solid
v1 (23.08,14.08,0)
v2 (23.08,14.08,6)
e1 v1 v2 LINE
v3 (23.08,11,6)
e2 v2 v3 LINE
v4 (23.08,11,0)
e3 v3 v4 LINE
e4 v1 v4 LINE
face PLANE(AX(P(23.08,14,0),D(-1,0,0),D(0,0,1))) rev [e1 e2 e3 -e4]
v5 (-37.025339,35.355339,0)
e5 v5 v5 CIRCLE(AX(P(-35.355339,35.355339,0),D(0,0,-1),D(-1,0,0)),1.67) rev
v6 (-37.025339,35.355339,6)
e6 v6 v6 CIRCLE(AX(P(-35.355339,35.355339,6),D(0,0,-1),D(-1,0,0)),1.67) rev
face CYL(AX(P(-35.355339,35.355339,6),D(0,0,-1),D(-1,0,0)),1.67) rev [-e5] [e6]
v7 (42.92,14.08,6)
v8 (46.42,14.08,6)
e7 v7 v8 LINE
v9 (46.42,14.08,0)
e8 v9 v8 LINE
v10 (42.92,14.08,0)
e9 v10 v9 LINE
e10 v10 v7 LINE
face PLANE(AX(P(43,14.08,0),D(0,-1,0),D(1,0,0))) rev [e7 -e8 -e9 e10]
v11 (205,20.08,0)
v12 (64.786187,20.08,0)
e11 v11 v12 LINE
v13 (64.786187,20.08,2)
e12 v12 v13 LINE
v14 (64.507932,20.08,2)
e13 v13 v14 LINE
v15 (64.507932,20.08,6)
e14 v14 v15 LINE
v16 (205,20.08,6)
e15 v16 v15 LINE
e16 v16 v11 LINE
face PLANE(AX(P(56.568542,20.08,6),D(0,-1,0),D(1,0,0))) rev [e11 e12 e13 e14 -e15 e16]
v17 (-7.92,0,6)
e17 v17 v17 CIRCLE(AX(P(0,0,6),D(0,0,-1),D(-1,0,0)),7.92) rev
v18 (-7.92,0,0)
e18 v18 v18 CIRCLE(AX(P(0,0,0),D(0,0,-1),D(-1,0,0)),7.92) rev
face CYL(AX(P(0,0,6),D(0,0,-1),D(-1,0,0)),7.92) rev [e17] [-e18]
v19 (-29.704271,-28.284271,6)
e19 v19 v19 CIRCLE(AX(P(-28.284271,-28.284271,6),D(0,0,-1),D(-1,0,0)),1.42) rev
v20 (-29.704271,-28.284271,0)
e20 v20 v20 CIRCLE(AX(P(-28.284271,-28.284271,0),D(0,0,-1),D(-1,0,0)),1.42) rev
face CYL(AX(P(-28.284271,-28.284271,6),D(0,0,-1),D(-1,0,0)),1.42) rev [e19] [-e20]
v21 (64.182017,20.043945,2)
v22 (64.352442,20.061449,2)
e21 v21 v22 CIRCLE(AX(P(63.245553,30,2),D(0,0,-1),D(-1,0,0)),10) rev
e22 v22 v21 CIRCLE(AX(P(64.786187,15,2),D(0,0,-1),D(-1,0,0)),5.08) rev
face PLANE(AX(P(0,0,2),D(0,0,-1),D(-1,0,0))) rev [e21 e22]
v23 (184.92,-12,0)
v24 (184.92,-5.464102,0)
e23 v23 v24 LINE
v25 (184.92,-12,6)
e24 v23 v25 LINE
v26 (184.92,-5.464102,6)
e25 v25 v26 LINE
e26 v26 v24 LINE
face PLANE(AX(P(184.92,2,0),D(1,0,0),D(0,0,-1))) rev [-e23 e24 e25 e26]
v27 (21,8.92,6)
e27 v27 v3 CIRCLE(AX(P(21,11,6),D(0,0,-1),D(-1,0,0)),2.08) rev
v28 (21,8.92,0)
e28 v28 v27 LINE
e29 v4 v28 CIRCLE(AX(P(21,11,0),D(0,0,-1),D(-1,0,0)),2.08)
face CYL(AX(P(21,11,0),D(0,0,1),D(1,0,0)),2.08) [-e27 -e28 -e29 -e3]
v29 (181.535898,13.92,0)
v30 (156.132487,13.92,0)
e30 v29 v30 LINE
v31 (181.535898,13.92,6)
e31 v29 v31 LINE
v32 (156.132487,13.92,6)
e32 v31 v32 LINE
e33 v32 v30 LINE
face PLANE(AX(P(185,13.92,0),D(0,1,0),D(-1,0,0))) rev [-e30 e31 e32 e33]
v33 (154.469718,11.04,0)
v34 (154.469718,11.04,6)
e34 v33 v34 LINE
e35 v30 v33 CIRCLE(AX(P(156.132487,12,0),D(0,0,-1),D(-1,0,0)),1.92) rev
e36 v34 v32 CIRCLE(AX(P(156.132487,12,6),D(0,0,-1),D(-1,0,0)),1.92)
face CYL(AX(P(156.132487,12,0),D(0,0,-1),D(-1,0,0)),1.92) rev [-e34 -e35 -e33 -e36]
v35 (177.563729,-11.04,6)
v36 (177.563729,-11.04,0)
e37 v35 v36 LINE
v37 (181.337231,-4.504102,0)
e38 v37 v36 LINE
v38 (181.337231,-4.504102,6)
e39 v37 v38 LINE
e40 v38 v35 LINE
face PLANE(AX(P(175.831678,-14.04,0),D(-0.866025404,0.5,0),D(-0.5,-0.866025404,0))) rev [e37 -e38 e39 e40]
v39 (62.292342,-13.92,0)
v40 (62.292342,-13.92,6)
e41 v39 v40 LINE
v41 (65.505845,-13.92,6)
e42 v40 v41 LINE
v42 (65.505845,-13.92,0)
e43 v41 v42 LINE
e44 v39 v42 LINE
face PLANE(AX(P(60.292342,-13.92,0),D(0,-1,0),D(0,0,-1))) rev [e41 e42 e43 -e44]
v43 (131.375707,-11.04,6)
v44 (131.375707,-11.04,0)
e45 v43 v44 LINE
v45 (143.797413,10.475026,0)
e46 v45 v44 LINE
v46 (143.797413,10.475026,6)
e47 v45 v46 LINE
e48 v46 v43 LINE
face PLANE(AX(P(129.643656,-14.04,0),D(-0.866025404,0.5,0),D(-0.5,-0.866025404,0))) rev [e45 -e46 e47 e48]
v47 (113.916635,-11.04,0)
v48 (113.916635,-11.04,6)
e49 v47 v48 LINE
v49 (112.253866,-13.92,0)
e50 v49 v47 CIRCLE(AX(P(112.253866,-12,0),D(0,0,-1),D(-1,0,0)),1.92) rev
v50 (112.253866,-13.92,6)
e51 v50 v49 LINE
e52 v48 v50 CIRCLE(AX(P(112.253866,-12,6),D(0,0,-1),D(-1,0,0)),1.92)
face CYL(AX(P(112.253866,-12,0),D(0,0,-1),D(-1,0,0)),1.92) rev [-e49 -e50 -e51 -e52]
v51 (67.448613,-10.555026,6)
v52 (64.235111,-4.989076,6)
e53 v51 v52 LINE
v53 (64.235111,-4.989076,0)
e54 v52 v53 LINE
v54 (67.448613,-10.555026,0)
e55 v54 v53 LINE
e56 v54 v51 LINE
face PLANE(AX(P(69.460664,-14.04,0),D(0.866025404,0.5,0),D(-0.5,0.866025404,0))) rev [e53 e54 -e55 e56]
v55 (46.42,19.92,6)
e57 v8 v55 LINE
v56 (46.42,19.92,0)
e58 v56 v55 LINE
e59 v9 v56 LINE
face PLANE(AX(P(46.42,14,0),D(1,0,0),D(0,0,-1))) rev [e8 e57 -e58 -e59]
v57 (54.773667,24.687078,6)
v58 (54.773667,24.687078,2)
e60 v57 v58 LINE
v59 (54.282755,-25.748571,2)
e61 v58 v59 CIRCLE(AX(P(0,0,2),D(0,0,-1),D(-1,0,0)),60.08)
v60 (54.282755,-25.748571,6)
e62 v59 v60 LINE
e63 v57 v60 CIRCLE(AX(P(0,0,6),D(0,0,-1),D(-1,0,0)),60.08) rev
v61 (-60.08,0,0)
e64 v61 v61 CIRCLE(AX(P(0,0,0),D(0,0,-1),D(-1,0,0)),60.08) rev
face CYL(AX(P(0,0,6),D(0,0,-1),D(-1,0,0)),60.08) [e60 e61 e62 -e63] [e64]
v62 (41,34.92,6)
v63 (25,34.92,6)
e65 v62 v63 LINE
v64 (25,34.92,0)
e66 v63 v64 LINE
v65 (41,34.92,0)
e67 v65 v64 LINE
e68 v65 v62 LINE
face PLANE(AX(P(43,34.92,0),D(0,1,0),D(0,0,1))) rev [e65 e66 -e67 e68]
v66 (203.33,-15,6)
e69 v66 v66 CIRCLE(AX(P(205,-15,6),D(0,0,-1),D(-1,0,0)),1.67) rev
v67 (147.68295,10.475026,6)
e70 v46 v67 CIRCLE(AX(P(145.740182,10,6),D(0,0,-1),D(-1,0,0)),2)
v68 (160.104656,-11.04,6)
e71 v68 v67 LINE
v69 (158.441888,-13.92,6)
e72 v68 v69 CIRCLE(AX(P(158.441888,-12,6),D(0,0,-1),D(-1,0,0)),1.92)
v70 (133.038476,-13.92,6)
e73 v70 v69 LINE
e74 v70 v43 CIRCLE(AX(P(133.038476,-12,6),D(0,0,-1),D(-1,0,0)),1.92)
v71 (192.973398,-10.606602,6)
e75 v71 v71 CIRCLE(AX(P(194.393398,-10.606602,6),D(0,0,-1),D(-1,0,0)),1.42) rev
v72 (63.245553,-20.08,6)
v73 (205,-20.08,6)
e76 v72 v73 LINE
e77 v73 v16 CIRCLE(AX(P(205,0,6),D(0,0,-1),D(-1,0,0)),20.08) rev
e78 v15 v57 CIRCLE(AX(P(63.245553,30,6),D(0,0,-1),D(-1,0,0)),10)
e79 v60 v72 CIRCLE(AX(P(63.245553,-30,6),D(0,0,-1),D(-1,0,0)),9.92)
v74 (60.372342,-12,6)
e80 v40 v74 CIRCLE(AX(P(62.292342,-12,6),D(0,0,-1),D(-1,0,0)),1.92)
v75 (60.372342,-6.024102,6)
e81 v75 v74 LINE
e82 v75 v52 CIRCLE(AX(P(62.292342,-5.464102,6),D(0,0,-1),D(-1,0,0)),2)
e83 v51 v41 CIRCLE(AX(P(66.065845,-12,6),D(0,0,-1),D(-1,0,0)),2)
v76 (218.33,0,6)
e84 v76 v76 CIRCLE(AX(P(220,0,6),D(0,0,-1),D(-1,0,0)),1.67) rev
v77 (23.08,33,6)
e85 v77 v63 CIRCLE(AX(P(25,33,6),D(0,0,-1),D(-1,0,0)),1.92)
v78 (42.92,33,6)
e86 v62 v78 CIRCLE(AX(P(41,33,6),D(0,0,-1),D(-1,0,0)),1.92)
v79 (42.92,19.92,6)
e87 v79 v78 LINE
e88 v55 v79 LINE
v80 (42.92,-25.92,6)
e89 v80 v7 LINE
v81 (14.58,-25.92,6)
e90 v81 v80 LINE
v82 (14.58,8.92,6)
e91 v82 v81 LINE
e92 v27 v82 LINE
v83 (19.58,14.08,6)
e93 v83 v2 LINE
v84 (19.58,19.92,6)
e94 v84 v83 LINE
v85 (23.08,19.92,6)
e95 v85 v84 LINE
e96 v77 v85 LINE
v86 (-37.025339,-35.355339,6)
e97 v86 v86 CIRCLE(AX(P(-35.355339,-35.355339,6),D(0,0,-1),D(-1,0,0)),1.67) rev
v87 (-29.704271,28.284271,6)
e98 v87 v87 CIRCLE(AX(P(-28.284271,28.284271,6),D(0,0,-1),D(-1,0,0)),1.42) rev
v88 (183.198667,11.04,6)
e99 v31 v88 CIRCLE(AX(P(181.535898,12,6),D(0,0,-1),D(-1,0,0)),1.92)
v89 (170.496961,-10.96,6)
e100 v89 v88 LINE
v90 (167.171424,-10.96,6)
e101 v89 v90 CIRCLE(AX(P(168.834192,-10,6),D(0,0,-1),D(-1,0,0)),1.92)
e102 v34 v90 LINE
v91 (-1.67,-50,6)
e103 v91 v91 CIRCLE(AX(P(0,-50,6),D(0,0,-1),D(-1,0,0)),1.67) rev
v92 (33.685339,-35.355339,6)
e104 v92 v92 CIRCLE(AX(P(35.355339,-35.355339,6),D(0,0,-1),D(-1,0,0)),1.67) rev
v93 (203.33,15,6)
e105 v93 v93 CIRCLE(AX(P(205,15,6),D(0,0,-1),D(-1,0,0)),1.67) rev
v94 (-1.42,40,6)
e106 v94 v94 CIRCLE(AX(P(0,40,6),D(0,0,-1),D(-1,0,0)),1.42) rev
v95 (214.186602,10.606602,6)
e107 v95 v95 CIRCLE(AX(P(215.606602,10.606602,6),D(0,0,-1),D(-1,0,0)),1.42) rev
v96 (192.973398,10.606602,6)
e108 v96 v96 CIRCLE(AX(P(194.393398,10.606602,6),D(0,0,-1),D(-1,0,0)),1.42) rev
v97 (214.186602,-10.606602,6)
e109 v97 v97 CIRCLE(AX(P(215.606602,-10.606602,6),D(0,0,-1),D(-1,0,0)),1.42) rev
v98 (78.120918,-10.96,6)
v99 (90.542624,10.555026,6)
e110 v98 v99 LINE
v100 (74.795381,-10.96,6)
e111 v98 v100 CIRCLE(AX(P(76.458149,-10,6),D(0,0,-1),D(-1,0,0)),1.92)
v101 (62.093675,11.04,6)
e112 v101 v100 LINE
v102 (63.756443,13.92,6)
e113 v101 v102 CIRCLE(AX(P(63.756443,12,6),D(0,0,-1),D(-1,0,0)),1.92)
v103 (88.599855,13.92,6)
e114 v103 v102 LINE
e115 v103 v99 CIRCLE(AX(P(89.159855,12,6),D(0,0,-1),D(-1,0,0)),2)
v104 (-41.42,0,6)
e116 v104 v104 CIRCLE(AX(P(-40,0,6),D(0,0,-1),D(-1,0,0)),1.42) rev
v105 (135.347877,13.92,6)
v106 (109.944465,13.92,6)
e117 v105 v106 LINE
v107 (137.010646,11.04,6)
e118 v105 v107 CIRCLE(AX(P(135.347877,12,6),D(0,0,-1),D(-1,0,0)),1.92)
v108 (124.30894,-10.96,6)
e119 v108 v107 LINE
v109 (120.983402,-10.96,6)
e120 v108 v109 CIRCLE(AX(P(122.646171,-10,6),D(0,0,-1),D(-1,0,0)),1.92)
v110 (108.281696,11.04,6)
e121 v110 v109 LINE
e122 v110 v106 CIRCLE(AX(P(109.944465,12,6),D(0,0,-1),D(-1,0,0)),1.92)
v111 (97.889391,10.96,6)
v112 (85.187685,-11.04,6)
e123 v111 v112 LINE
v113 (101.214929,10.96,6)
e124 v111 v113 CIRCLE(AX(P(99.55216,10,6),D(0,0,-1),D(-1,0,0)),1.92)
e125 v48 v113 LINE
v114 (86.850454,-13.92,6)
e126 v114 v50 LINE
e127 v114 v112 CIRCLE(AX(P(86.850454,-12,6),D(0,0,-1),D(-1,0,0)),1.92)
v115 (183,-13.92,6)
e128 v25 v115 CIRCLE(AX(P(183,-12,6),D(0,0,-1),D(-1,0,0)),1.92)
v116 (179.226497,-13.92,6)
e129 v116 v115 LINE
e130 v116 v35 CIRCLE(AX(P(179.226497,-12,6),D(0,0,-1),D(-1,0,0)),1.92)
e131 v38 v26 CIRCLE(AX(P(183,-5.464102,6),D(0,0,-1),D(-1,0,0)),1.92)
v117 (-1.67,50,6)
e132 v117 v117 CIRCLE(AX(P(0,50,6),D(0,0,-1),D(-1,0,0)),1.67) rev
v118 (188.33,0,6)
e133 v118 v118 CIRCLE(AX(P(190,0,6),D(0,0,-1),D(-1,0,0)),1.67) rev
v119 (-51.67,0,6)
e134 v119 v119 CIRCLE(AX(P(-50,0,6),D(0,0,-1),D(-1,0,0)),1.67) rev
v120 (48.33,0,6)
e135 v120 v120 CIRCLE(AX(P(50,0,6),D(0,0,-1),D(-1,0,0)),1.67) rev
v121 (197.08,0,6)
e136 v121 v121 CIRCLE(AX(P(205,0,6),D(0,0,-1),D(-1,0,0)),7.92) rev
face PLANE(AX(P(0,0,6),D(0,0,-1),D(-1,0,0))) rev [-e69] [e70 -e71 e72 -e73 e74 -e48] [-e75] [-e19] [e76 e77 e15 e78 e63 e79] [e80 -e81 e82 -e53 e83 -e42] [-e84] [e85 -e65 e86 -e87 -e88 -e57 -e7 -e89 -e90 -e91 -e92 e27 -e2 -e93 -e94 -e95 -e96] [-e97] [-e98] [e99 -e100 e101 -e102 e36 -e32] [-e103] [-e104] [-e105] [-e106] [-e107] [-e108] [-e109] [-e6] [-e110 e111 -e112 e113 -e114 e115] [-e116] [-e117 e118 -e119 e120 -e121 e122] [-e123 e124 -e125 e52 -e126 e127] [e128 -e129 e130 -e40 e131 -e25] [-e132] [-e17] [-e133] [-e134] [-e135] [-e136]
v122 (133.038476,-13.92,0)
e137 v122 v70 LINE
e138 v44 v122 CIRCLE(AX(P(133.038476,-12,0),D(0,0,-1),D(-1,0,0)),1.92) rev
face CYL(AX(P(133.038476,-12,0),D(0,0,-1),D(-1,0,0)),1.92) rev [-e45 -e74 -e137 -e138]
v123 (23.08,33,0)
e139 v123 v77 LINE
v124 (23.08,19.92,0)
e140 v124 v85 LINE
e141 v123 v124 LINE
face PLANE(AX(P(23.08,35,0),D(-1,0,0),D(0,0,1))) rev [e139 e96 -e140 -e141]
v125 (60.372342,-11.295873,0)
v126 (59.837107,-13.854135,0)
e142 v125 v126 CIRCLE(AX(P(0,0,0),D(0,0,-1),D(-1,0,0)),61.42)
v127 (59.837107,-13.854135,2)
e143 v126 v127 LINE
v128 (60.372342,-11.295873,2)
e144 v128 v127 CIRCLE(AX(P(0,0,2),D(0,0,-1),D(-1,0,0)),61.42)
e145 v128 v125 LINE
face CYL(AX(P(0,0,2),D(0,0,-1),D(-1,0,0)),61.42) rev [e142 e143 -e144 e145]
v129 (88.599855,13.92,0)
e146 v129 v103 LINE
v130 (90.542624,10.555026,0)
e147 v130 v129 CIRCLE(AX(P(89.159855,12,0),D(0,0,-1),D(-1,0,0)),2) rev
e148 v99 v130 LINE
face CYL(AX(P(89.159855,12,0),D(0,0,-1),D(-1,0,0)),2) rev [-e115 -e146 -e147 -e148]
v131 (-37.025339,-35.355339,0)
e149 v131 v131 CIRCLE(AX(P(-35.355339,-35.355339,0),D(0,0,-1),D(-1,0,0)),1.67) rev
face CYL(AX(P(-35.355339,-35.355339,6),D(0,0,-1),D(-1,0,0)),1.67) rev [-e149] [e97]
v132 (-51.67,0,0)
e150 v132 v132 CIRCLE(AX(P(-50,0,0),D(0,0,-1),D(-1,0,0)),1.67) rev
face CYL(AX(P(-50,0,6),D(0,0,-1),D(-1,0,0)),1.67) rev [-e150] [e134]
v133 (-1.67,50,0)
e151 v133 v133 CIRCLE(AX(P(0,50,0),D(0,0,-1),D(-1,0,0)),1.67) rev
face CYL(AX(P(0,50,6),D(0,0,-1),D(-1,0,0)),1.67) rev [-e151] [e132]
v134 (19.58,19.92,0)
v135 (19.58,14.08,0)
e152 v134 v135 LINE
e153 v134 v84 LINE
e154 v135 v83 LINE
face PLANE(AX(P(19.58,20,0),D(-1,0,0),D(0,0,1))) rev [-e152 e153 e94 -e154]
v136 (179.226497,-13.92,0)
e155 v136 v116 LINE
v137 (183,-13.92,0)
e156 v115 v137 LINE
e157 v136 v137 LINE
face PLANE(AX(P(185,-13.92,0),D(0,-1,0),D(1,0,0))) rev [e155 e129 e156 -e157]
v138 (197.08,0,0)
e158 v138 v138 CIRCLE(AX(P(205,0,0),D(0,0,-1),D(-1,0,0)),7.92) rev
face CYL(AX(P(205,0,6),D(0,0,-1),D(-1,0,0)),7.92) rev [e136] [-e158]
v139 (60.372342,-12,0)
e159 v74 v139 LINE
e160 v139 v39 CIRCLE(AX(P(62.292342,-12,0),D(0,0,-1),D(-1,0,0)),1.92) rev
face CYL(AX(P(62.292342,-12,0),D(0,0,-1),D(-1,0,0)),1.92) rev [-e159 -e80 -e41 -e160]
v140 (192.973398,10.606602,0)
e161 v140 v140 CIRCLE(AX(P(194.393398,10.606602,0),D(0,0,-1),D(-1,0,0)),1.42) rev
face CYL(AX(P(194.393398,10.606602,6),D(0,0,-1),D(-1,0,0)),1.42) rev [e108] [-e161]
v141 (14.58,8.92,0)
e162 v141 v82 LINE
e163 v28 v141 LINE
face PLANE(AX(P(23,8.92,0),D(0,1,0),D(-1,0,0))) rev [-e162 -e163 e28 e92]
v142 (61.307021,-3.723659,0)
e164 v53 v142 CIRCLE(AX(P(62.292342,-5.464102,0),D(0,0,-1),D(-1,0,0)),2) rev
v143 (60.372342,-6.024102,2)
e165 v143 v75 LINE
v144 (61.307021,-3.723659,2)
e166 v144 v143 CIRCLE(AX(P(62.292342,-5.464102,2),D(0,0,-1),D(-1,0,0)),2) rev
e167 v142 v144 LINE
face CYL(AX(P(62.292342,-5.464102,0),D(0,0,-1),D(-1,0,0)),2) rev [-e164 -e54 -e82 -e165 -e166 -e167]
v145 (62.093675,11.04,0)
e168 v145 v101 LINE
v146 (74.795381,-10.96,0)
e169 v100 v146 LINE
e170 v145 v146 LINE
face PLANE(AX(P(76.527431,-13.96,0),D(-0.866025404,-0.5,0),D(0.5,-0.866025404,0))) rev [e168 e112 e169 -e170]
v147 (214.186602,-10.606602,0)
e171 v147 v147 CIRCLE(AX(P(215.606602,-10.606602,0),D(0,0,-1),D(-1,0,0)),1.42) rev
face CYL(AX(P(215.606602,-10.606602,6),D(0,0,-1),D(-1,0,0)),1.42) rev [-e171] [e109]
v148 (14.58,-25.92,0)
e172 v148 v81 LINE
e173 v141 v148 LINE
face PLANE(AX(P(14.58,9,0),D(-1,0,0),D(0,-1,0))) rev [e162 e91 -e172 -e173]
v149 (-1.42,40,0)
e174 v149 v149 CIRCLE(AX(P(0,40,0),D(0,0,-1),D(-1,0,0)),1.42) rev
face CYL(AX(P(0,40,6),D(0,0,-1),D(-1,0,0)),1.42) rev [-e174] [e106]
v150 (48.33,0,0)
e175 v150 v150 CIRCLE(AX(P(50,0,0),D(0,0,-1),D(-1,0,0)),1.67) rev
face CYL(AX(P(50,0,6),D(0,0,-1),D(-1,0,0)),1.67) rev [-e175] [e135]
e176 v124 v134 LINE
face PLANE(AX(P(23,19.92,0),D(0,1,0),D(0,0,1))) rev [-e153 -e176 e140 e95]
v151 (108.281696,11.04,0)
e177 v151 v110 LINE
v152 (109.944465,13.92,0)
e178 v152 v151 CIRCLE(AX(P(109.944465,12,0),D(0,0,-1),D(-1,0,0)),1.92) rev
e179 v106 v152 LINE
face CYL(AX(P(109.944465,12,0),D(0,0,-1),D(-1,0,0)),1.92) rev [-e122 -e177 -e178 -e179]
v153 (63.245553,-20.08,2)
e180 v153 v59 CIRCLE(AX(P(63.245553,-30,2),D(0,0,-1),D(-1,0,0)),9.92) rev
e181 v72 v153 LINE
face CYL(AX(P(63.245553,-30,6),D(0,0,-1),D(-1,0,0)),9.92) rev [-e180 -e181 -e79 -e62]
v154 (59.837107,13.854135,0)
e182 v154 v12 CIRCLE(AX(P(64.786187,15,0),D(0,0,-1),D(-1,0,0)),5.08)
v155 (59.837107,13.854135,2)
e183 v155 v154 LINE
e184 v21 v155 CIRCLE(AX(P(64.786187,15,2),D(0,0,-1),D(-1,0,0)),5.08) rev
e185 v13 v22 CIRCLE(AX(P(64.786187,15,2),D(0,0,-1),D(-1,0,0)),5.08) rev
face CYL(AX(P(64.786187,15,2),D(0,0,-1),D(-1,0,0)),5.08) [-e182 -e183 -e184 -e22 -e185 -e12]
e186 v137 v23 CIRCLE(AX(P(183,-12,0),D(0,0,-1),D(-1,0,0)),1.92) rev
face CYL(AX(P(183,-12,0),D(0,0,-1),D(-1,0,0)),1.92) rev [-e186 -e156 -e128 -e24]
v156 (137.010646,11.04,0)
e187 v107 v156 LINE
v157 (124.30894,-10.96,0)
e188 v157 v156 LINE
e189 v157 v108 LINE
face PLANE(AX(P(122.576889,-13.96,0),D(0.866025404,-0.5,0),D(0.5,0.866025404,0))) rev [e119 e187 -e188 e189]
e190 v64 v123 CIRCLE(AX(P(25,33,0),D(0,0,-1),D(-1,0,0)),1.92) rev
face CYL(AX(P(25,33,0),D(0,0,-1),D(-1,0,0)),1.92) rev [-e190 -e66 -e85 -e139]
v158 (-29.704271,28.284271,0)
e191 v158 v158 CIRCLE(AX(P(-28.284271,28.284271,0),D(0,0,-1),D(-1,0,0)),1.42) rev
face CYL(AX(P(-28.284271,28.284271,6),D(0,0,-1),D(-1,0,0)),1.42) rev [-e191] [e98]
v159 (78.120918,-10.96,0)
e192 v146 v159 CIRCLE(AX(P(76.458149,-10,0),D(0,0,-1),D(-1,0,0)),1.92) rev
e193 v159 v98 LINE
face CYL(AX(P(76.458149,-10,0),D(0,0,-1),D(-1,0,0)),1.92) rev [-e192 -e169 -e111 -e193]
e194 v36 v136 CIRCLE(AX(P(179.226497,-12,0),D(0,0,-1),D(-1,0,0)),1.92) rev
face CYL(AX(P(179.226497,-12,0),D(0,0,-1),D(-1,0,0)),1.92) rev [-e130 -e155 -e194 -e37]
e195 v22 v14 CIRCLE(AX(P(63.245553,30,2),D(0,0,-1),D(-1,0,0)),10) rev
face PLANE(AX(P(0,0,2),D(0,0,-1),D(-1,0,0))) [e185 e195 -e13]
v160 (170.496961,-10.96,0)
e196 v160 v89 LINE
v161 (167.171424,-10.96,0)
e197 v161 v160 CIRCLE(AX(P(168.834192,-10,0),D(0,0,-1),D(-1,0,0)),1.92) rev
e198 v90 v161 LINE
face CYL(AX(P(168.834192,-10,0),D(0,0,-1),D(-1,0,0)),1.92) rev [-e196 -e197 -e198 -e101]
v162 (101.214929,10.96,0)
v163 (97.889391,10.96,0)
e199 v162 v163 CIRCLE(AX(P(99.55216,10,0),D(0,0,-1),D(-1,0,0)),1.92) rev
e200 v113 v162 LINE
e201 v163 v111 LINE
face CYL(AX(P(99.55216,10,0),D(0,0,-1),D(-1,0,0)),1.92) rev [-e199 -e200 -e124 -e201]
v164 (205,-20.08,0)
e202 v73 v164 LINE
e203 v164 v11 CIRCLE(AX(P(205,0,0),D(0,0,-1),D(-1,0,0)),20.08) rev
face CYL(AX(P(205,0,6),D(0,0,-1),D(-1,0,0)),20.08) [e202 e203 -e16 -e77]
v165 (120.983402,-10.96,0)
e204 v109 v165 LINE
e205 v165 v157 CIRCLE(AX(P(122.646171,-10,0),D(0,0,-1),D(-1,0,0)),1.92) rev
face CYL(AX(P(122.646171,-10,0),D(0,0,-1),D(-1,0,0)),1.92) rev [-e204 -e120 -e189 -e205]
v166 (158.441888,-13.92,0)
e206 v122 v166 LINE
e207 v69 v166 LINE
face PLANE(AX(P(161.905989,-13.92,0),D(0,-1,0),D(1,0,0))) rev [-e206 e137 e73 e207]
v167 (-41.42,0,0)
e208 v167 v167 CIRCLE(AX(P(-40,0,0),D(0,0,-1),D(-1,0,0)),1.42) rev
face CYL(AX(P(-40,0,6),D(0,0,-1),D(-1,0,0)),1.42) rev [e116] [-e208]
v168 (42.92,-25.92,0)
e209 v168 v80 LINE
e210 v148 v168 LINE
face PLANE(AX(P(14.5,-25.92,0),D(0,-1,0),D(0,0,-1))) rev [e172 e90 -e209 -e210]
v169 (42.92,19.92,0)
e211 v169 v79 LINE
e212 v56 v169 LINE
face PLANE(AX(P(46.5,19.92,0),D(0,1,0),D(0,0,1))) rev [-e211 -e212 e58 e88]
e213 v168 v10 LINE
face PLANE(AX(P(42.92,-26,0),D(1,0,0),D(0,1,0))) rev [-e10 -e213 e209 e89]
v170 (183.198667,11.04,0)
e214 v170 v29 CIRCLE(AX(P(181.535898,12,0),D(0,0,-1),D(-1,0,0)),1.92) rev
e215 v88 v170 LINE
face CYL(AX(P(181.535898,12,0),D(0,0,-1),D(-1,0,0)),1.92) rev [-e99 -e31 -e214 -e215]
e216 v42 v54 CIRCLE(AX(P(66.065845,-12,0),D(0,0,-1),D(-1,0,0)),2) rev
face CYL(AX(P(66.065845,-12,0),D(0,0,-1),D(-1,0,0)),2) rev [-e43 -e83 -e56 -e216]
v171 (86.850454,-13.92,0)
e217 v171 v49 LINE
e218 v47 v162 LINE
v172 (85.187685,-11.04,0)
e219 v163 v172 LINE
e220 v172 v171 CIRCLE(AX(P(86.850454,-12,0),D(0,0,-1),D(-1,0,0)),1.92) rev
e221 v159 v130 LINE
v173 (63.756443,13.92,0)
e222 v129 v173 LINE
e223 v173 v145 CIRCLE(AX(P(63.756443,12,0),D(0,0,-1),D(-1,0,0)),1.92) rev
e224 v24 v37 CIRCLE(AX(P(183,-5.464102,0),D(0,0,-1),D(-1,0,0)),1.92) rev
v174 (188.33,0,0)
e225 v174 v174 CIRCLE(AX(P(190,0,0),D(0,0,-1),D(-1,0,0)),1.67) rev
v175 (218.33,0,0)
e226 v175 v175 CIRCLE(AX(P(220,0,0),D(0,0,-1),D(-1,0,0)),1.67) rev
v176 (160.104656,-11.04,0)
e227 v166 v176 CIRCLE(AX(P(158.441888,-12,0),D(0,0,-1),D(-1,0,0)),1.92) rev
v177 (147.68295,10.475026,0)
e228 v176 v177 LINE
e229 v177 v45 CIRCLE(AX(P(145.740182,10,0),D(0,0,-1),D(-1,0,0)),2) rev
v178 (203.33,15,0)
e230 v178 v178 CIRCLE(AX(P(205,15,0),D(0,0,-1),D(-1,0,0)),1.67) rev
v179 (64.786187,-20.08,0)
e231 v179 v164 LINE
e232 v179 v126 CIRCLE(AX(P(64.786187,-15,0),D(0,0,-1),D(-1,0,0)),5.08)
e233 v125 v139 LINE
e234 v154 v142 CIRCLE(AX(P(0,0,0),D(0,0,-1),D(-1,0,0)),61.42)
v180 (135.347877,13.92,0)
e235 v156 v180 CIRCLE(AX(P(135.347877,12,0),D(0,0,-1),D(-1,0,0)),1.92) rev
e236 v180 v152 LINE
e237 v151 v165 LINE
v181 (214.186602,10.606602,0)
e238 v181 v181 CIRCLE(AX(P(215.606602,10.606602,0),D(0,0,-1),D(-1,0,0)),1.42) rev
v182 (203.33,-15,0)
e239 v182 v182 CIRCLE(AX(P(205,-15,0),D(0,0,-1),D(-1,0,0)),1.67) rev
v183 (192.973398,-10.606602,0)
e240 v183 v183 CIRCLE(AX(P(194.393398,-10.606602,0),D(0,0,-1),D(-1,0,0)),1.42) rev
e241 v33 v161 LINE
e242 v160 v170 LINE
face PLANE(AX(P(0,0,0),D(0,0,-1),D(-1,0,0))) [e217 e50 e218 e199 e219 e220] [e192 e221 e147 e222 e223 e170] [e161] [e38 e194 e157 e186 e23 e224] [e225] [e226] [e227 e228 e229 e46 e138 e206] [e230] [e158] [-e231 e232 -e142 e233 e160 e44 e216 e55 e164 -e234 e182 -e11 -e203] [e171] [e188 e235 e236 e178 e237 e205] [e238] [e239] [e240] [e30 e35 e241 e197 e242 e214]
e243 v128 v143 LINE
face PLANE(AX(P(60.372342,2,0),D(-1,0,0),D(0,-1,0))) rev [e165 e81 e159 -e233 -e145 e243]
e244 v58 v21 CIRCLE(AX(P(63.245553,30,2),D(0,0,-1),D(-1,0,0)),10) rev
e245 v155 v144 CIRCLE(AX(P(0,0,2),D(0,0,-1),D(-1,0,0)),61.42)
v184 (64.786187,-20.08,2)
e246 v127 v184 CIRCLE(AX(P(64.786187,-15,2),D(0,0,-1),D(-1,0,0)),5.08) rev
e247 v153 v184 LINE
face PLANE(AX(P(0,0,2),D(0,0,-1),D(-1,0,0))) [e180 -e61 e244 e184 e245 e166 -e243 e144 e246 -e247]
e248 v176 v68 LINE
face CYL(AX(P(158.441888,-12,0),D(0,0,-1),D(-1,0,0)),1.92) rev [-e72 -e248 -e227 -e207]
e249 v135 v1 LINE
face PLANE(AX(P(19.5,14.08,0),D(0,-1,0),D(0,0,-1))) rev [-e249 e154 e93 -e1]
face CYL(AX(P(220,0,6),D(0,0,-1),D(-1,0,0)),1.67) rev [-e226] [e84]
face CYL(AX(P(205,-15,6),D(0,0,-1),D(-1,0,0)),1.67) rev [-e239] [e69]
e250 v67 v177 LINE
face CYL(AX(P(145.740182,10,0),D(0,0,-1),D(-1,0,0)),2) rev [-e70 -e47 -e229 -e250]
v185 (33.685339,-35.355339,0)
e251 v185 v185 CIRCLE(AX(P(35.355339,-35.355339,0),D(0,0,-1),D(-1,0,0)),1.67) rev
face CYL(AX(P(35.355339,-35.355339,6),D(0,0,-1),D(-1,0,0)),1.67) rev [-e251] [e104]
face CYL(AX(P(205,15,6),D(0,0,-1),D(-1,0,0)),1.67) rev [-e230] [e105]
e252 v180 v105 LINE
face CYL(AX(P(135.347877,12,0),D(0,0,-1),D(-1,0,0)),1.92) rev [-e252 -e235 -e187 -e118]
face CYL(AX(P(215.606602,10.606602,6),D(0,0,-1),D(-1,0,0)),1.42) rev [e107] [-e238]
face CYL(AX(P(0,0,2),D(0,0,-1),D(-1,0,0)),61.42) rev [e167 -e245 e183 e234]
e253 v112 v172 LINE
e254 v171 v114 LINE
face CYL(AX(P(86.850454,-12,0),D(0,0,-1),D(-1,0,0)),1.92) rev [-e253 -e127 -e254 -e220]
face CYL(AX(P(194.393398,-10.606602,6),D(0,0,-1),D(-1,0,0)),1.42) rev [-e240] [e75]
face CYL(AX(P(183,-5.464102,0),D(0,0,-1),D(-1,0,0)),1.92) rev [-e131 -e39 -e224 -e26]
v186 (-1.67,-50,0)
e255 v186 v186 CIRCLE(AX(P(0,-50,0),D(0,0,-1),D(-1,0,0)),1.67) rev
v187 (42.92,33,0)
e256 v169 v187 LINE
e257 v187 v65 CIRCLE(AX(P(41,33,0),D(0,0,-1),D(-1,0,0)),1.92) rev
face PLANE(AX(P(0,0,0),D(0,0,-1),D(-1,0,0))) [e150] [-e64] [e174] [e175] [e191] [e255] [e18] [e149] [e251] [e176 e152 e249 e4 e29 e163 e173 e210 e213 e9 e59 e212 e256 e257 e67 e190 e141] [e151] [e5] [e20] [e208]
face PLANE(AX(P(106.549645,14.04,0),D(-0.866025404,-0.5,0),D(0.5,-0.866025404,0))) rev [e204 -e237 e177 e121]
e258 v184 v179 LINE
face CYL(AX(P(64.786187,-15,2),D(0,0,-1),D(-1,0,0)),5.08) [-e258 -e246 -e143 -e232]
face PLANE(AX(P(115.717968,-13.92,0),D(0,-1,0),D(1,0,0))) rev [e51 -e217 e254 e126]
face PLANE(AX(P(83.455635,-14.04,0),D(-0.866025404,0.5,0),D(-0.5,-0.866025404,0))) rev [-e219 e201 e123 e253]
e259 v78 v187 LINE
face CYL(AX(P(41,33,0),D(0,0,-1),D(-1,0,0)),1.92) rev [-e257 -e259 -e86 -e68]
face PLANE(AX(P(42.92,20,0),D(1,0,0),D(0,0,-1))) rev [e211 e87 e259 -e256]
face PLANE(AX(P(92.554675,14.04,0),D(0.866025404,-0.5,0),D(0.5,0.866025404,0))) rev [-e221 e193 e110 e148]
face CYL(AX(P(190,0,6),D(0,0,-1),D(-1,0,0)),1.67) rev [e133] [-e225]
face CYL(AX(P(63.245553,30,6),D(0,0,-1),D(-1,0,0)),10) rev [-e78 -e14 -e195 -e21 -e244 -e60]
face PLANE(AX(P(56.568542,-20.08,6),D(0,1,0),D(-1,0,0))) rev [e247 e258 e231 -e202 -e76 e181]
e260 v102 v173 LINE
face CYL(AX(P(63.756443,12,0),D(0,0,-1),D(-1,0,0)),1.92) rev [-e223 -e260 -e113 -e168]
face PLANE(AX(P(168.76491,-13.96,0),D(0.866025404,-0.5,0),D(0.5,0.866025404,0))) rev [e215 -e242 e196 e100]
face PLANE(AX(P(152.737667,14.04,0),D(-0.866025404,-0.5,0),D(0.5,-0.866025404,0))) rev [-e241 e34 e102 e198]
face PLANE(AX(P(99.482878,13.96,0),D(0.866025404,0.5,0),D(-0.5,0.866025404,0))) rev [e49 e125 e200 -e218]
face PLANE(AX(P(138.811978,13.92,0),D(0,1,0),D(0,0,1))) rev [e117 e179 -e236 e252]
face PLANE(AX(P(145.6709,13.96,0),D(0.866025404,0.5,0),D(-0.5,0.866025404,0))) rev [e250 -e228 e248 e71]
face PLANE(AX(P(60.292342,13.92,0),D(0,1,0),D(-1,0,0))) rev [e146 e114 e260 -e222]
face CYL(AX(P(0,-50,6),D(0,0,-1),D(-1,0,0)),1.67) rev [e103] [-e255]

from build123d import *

# Parameters (mm, degrees)
SKETCH1_R              = 8
SKETCH1_R_2            = 1.75
SKETCH1_R_3            = 1.5
BOSS_EXTRUDE1_DEPTH    = 6
CUT_EXTRUDE2_DEPTH     = 233.939906414
FILLET3_R              = 10
FILLET4_R              = 2
SKETCH4_R              = 61.5
SKETCH4_R_2            = 60
CUT_EXTRUDE3_DEPTH     = 2
FILLET6_R              = 5
CUT_EXTRUDE5_DEPTH     = 233.939906414
FILLET7_R              = 2
MOVE_FACE1_OUTLINE_R   = 60.08
MOVE_FACE1_OUTLINE_R_2 = 60
MOVE_FACE1_OUTLINE_R_3 = 8
MOVE_FACE1_OUTLINE_R_4 = 7.92
MOVE_FACE1_OUTLINE_R_5 = 1.75
MOVE_FACE1_OUTLINE_R_6 = 1.67
MOVE_FACE1_OUTLINE_R_7 = 1.5
MOVE_FACE1_OUTLINE_R_8 = 1.42
MOVE_FACE1_DEPTH       = 6
MOVE_START             = 2
MOVE_FACE1_2_DEPTH     = 4
MOVE_FACE1_3_DEPTH     = 2


# Read off the part's stored shape, not the designer's step: Move Face1
with BuildPart() as part:
    # Sketch1 → Boss-Extrude1 (new body)
    with BuildSketch(Plane.XY):
        with BuildLine():
            Line((56.568542495, -20), (205, -20))
            ThreePointArc((205, -20), (225, 0), (205, 20))
            Line((205, 20), (56.568542495, 20))
            ThreePointArc((56.568542495, 20), (-60, 0), (56.568542495, -20))
        make_face()
        Circle(SKETCH1_R, mode=Mode.SUBTRACT)
        with Locations((205, 0)):
            Circle(SKETCH1_R, mode=Mode.SUBTRACT)
        with Locations((205, -15)):
            Circle(SKETCH1_R_2, mode=Mode.SUBTRACT)
        with Locations((215.606601718, -10.606601718)):
            Circle(SKETCH1_R_3, mode=Mode.SUBTRACT)
        with Locations((190, 0)):
            Circle(SKETCH1_R_2, mode=Mode.SUBTRACT)
        with Locations((194.393398282, -10.606601718)):
            Circle(SKETCH1_R_3, mode=Mode.SUBTRACT)
        with Locations((205, 15)):
            Circle(SKETCH1_R_2, mode=Mode.SUBTRACT)
        with Locations((194.393398282, 10.606601718)):
            Circle(SKETCH1_R_3, mode=Mode.SUBTRACT)
        with Locations((220, 0)):
            Circle(SKETCH1_R_2, mode=Mode.SUBTRACT)
        with Locations((215.606601718, 10.606601718)):
            Circle(SKETCH1_R_3, mode=Mode.SUBTRACT)
        with Locations((0, -50)):
            Circle(SKETCH1_R_2, mode=Mode.SUBTRACT)
        with Locations((-28.284271247, -28.284271247)):
            Circle(SKETCH1_R_3, mode=Mode.SUBTRACT)
        with Locations((-35.355339059, -35.355339059)):
            Circle(SKETCH1_R_2, mode=Mode.SUBTRACT)
        with Locations((-40, 0)):
            Circle(SKETCH1_R_3, mode=Mode.SUBTRACT)
        with Locations((-50, 0)):
            Circle(SKETCH1_R_2, mode=Mode.SUBTRACT)
        with Locations((-28.284271247, 28.284271247)):
            Circle(SKETCH1_R_3, mode=Mode.SUBTRACT)
        with Locations((-35.355339059, 35.355339059)):
            Circle(SKETCH1_R_2, mode=Mode.SUBTRACT)
        with Locations((0, 40)):
            Circle(SKETCH1_R_3, mode=Mode.SUBTRACT)
        with Locations((0, 50)):
            Circle(SKETCH1_R_2, mode=Mode.SUBTRACT)
        with Locations((50, 0)):
            Circle(SKETCH1_R_2, mode=Mode.SUBTRACT)
        with Locations((35.355339059, -35.355339059)):
            Circle(SKETCH1_R_2, mode=Mode.SUBTRACT)
    extrude(amount=BOSS_EXTRUDE1_DEPTH)

    # Sketch3 → Cut-Extrude2 (cut, through all)
    with BuildSketch(Plane.XY.offset(6)):
        Polygon((14.5, -26), (43, -26), (43, 14), (46.5, 14), (46.5, 20), (43, 20), (43, 35), (23, 35), (23, 20), (19.5, 20), (19.5, 14), (23, 14), (23, 9), (14.5, 9), align=None)
    extrude(amount=-CUT_EXTRUDE2_DEPTH, mode=Mode.SUBTRACT)

    # Fillet3
    fillet3_edges = [part.edges().sort_by_distance(p)[0] for p in [
        (56.568542495, 20, 3),
        (56.568542495, -20, 3),
    ]]
    fillet(fillet3_edges, radius=FILLET3_R)

    # Fillet4
    fillet4_edges = [part.edges().sort_by_distance(p)[0] for p in [
        (23, 9, 3),
        (23, 35, 3),
        (43, 35, 3),
    ]]
    fillet(fillet4_edges, radius=FILLET4_R)

    # Sketch4 → Cut-Extrude3 (cut)
    with BuildSketch(Plane(origin=(0, 0, 0), x_dir=(-1, 0, 0), z_dir=(0, 0, -1))):
        Circle(SKETCH4_R)
        Circle(SKETCH4_R_2, mode=Mode.SUBTRACT)
    extrude(amount=-CUT_EXTRUDE3_DEPTH, mode=Mode.SUBTRACT)

    # Fillet6
    # the kernel refuses this fillet: 5 mm, written as the material it takes off along each edge
    with BuildSketch(Plane(origin=(57.50107649, -21.81458692, -20.752870911), x_dir=(0.2907993374823747, 0.9567840641021421, 0), z_dir=(0, 0, 1))) as fillet6_piece_1:
        with BuildLine():
            CenterArc((8.63859342, -4.988600088), FILLET6_R, 93.869776954, 103.036040292)
            Line((3.854673099, -6.442596775), (3.376281067, -6.587996444))
            ThreePointArc((3.376281067, -6.587996444), (2.928265838, -5.113942771), (-0.308059139, -0.393826824))
            Line((-0.308059139, -0.393826824), (0.033744506, 0.498860009))
            ThreePointArc((0.033744506, 0.498860009), (4.150574182, 0.359781078), (8.267403859, 0.498860009))
            Line((8.267403859, 0.498860009), (8.301148365, 0))
        make_face()
    extrude(amount=22.752870911, mode=Mode.SUBTRACT)
    with BuildSketch(Plane(origin=(57.50107649, 21.81458692, -20.752870911), x_dir=(0.2907993374823739, -0.9567840641021422, 0), z_dir=(0, 0, 1))) as fillet6_piece_2:
        with BuildLine():
            CenterArc((8.63859342, 4.988600088), FILLET6_R, 163.094182754, 103.036040292)
            Line((3.854673099, 6.442596775), (3.376281067, 6.587996444))
            ThreePointArc((3.376281067, 6.587996444), (2.928265838, 5.113942771), (-0.308059139, 0.393826824))
            Line((-0.308059139, 0.393826824), (0.033744506, -0.498860009))
            ThreePointArc((0.033744506, -0.498860009), (4.150574182, -0.359781078), (8.267403859, -0.498860009))
            Line((8.267403859, -0.498860009), (8.301148365, 0))
        make_face()
    extrude(amount=22.752870911, mode=Mode.SUBTRACT)

    # Sketch6 → Cut-Extrude5 (cut, through all)
    with BuildSketch(Plane.XY.offset(6)):
        Polygon((60.292341855, 14), (92.62395693, 14), (76.458149392, -14), align=None)
        Polygon((83.386352623, -14), (99.55216016, 14), (115.717967697, -14), align=None)
        Polygon((106.48036339, 14), (122.646170928, -14), (138.811978465, 14), align=None)
        Polygon((129.574374158, -14), (145.740181695, 14), (161.905989232, -14), align=None)
        Polygon((152.668384925, 14), (168.834192463, -14), (185, 14), align=None)
        Polygon((60.292341855, 2), (60.292341855, -14), (69.529946162, -14), align=None)
        Polygon((185, 2), (185, -14), (175.762395693, -14), align=None)
    extrude(amount=-CUT_EXTRUDE5_DEPTH, mode=Mode.SUBTRACT)

    # Fillet7
    fillet7_edges = [part.edges().sort_by_distance(p)[0] for p in [
        (60.292341855, 14, 3),
        (185, 2, 3),
        (175.762395693, -14, 3),
        (185, -14, 3),
        (152.668384925, 14, 3),
        (168.834192463, -14, 3),
        (185, 14, 3),
        (129.574374158, -14, 3),
        (161.905989232, -14, 3),
        (145.740181695, 14, 3),
        (138.811978465, 14, 3),
        (122.646170928, -14, 3),
        (106.48036339, 14, 3),
        (115.717967697, -14, 3),
        (99.55216016, 14, 3),
        (83.386352623, -14, 3),
        (60.292341855, -14, 3),
        (76.458149392, -14, 3),
        (69.529946162, -14, 3),
        (92.62395693, 14, 3),
        (60.292341855, 2, 4),
    ]]
    fillet(fillet7_edges, radius=FILLET7_R)

    # Move Face1 outline → Move Face1 (add)
    # profile 1 of 31: a face of its own
    with BuildSketch(Plane.XY):
        with BuildLine():
            ThreePointArc((59.837106665, 13.854135338), (61.206368938, 5.118281102), (61.307020533, -3.723658599))
            ThreePointArc((61.307020533, -3.723658599), (61.348170817, -3.700996103), (61.389842031, -3.67930637))
            ThreePointArc((61.389842031, -3.67930637), (61.284031957, 5.149507464), (59.915044935, 13.872180451))
            ThreePointArc((59.915044935, 13.872180451), (60.872167271, 18.111342335), (64.786186799, 20))
            Line((64.786186799, 20), (205, 20))
            ThreePointArc((205, 20), (225, 0), (205, -20))
            Line((205, -20), (64.786186799, -20))
            ThreePointArc((64.786186799, -20), (60.872167271, -18.111342335), (59.915044935, -13.872180451))
            ThreePointArc((59.915044935, -13.872180451), (60.111708651, -12.993555444), (60.295488483, -12.112145497))
            ThreePointArc((60.295488483, -12.112145497), (60.918349678, -13.453322227), (62.292341855, -14))
            Line((62.292341855, -14), (66.065844547, -14))
            ThreePointArc((66.065844547, -14), (65.783001835, -13.979898987), (65.505844547, -13.92))
            Line((65.505844547, -13.92), (62.292341855, -13.92))
            ThreePointArc((62.292341855, -13.92), (60.934696835, -13.35764502), (60.372341855, -12))
            Line((60.372341855, -12), (60.372341855, -11.295872651))
            ThreePointArc((60.372341855, -11.295872651), (60.118333771, -12.577851352), (59.837106665, -13.854135338))
            ThreePointArc((59.837106665, -13.854135338), (60.809542958, -18.161123813), (64.786186799, -20.08))
            Line((64.786186799, -20.08), (205, -20.08))
            ThreePointArc((205, -20.08), (225.08, 0), (205, 20.08))
            Line((205, 20.08), (64.786186799, 20.08))
            ThreePointArc((64.786186799, 20.08), (64.569116303, 20.075360125), (64.352442334, 20.061448976))
            ThreePointArc((64.352442334, 20.061448976), (64.267267313, 20.052331918), (64.18201732, 20.043944809))
            ThreePointArc((64.18201732, 20.043944809), (60.628293024, 17.918616001), (59.837106665, 13.854135338))
        make_face()
    # profile 2 of 31: a face of its own
    with BuildSketch(Plane.XY):
        with BuildLine():
            Line((67.797895355, -11), (64.024392662, -4.464101615))
            ThreePointArc((64.024392662, -4.464101615), (64.148406031, -4.719101096), (64.23511063, -4.989075841))
            Line((64.23511063, -4.989075841), (67.448613322, -10.555025774))
            ThreePointArc((67.448613322, -10.555025774), (67.639066011, -10.765101532), (67.797895355, -11))
        make_face()
    # profile 3 of 31: a face of its own
    with BuildSketch(Plane.XY):
        Circle(MOVE_FACE1_OUTLINE_R)
        Circle(MOVE_FACE1_OUTLINE_R_2, mode=Mode.SUBTRACT)
    # profile 4 of 31: a face of its own
    with BuildSketch(Plane.XY):
        with BuildLine():
            Line((74.795380617, -10.96), (62.093674695, 11.04))
            ThreePointArc((62.093674695, 11.04), (62.093674695, 12.96), (63.75644347, 13.92))
            Line((63.75644347, 13.92), (88.599855315, 13.92))
            ThreePointArc((88.599855315, 13.92), (88.877012603, 13.979898987), (89.159855315, 14))
            Line((89.159855315, 14), (63.75644347, 14))
            ThreePointArc((63.75644347, 14), (62.024392663, 13), (62.024392663, 11))
            Line((62.024392663, 11), (74.726098585, -11))
            ThreePointArc((74.726098585, -11), (76.458149392, -12), (78.1902002, -11))
            Line((78.1902002, -11), (90.891906122, 11))
            ThreePointArc((90.891906122, 11), (90.733076778, 10.765101532), (90.54262409, 10.555025774))
            Line((90.54262409, 10.555025774), (78.120918168, -10.96))
            ThreePointArc((78.120918168, -10.96), (76.458149393, -11.92), (74.795380617, -10.96))
        make_face()
    # profile 5 of 31: a face of its own
    with BuildSketch(Plane.XY):
        with BuildLine():
            Line((158.441887617, -13.92), (133.038475773, -13.92))
            ThreePointArc((133.038475773, -13.92), (131.375706998, -12.96), (131.375706998, -11.04))
            Line((131.375706998, -11.04), (143.79741292, 10.475025774))
            ThreePointArc((143.79741292, 10.475025774), (143.884117519, 10.74500052), (144.008130888, 11))
            Line((144.008130888, 11), (131.306424965, -11))
            ThreePointArc((131.306424965, -11), (131.306424965, -13), (133.038475773, -14))
            Line((133.038475773, -14), (158.441887617, -14))
            ThreePointArc((158.441887617, -14), (160.173938425, -13), (160.173938425, -11))
            Line((160.173938425, -11), (147.472232503, 11))
            ThreePointArc((147.472232503, 11), (147.596245871, 10.745000519), (147.68295047, 10.475025774))
            Line((147.68295047, 10.475025774), (160.104656393, -11.04))
            ThreePointArc((160.104656393, -11.04), (160.104656393, -12.96), (158.441887617, -13.92))
        make_face()
    # profile 6 of 31: a face of its own
    with BuildSketch(Plane.XY):
        Circle(MOVE_FACE1_OUTLINE_R_3)
        Circle(MOVE_FACE1_OUTLINE_R_4, mode=Mode.SUBTRACT)
    # profile 7 of 31: a face of its own
    with BuildSketch(Plane.XY):
        with Locations((205, 0)):
            Circle(MOVE_FACE1_OUTLINE_R_3)
        with Locations((205, 0)):
            Circle(MOVE_FACE1_OUTLINE_R_4, mode=Mode.SUBTRACT)
    # profile 8 of 31: a face of its own
    with BuildSketch(Plane.XY):
        with Locations((205, -15)):
            Circle(MOVE_FACE1_OUTLINE_R_5)
        with Locations((205, -15)):
            Circle(MOVE_FACE1_OUTLINE_R_6, mode=Mode.SUBTRACT)
    # profile 9 of 31: a face of its own
    with BuildSketch(Plane.XY):
        with Locations((215.606601718, -10.606601718)):
            Circle(MOVE_FACE1_OUTLINE_R_7)
        with Locations((215.606601718, -10.606601718)):
            Circle(MOVE_FACE1_OUTLINE_R_8, mode=Mode.SUBTRACT)
    # profile 10 of 31: a face of its own
    with BuildSketch(Plane.XY):
        with Locations((190, 0)):
            Circle(MOVE_FACE1_OUTLINE_R_5)
        with Locations((190, 0)):
            Circle(MOVE_FACE1_OUTLINE_R_6, mode=Mode.SUBTRACT)
    # profile 11 of 31: a face of its own
    with BuildSketch(Plane.XY):
        with Locations((194.393398282, -10.606601718)):
            Circle(MOVE_FACE1_OUTLINE_R_7)
        with Locations((194.393398282, -10.606601718)):
            Circle(MOVE_FACE1_OUTLINE_R_8, mode=Mode.SUBTRACT)
    # profile 12 of 31: a face of its own
    with BuildSketch(Plane.XY):
        with Locations((205, 15)):
            Circle(MOVE_FACE1_OUTLINE_R_5)
        with Locations((205, 15)):
            Circle(MOVE_FACE1_OUTLINE_R_6, mode=Mode.SUBTRACT)
    # profile 13 of 31: a face of its own
    with BuildSketch(Plane.XY):
        with Locations((194.393398282, 10.606601718)):
            Circle(MOVE_FACE1_OUTLINE_R_7)
        with Locations((194.393398282, 10.606601718)):
            Circle(MOVE_FACE1_OUTLINE_R_8, mode=Mode.SUBTRACT)
    # profile 14 of 31: a face of its own
    with BuildSketch(Plane.XY):
        with Locations((220, 0)):
            Circle(MOVE_FACE1_OUTLINE_R_5)
        with Locations((220, 0)):
            Circle(MOVE_FACE1_OUTLINE_R_6, mode=Mode.SUBTRACT)
    # profile 15 of 31: a face of its own
    with BuildSketch(Plane.XY):
        with Locations((215.606601718, 10.606601718)):
            Circle(MOVE_FACE1_OUTLINE_R_7)
        with Locations((215.606601718, 10.606601718)):
            Circle(MOVE_FACE1_OUTLINE_R_8, mode=Mode.SUBTRACT)
    # profile 16 of 31: a face of its own
    with BuildSketch(Plane.XY):
        with Locations((0, -50)):
            Circle(MOVE_FACE1_OUTLINE_R_5)
        with Locations((0, -50)):
            Circle(MOVE_FACE1_OUTLINE_R_6, mode=Mode.SUBTRACT)
    # profile 17 of 31: a face of its own
    with BuildSketch(Plane.XY):
        with Locations((-28.284271247, -28.284271247)):
            Circle(MOVE_FACE1_OUTLINE_R_7)
        with Locations((-28.284271247, -28.284271247)):
            Circle(MOVE_FACE1_OUTLINE_R_8, mode=Mode.SUBTRACT)
    # profile 18 of 31: a face of its own
    with BuildSketch(Plane.XY):
        with Locations((-35.355339059, -35.355339059)):
            Circle(MOVE_FACE1_OUTLINE_R_5)
        with Locations((-35.355339059, -35.355339059)):
            Circle(MOVE_FACE1_OUTLINE_R_6, mode=Mode.SUBTRACT)
    # profile 19 of 31: a face of its own
    with BuildSketch(Plane.XY):
        with Locations((-40, 0)):
            Circle(MOVE_FACE1_OUTLINE_R_7)
        with Locations((-40, 0)):
            Circle(MOVE_FACE1_OUTLINE_R_8, mode=Mode.SUBTRACT)
    # profile 20 of 31: a face of its own
    with BuildSketch(Plane.XY):
        with Locations((-50, 0)):
            Circle(MOVE_FACE1_OUTLINE_R_5)
        with Locations((-50, 0)):
            Circle(MOVE_FACE1_OUTLINE_R_6, mode=Mode.SUBTRACT)
    # profile 21 of 31: a face of its own
    with BuildSketch(Plane.XY):
        with Locations((-28.284271247, 28.284271247)):
            Circle(MOVE_FACE1_OUTLINE_R_7)
        with Locations((-28.284271247, 28.284271247)):
            Circle(MOVE_FACE1_OUTLINE_R_8, mode=Mode.SUBTRACT)
    # profile 22 of 31: a face of its own
    with BuildSketch(Plane.XY):
        with Locations((-35.355339059, 35.355339059)):
            Circle(MOVE_FACE1_OUTLINE_R_5)
        with Locations((-35.355339059, 35.355339059)):
            Circle(MOVE_FACE1_OUTLINE_R_6, mode=Mode.SUBTRACT)
    # profile 23 of 31: a face of its own
    with BuildSketch(Plane.XY):
        with Locations((0, 40)):
            Circle(MOVE_FACE1_OUTLINE_R_7)
        with Locations((0, 40)):
            Circle(MOVE_FACE1_OUTLINE_R_8, mode=Mode.SUBTRACT)
    # profile 24 of 31: a face of its own
    with BuildSketch(Plane.XY):
        with Locations((0, 50)):
            Circle(MOVE_FACE1_OUTLINE_R_5)
        with Locations((0, 50)):
            Circle(MOVE_FACE1_OUTLINE_R_6, mode=Mode.SUBTRACT)
    # profile 25 of 31: a face of its own
    with BuildSketch(Plane.XY):
        with Locations((50, 0)):
            Circle(MOVE_FACE1_OUTLINE_R_5)
        with Locations((50, 0)):
            Circle(MOVE_FACE1_OUTLINE_R_6, mode=Mode.SUBTRACT)
    # profile 26 of 31: a face of its own
    with BuildSketch(Plane.XY):
        with Locations((35.355339059, -35.355339059)):
            Circle(MOVE_FACE1_OUTLINE_R_5)
        with Locations((35.355339059, -35.355339059)):
            Circle(MOVE_FACE1_OUTLINE_R_6, mode=Mode.SUBTRACT)
    # profile 27 of 31: a face of its own
    with BuildSketch(Plane.XY):
        with BuildLine():
            Line((21, 9), (14.5, 9))
            Line((14.5, 9), (14.5, -26))
            Line((14.5, -26), (43, -26))
            Line((43, -26), (43, 14))
            Line((43, 14), (46.5, 14))
            Line((46.5, 14), (46.5, 20))
            Line((46.5, 20), (43, 20))
            Line((43, 20), (43, 33))
            ThreePointArc((43, 33), (42.414213562, 34.414213562), (41, 35))
            Line((41, 35), (25, 35))
            ThreePointArc((25, 35), (23.585786438, 34.414213562), (23, 33))
            Line((23, 33), (23, 20))
            Line((23, 20), (19.5, 20))
            Line((19.5, 20), (19.5, 14))
            Line((19.5, 14), (23, 14))
            Line((23, 14), (23, 11))
            ThreePointArc((23, 11), (22.414213562, 9.585786438), (21, 9))
        make_face()
        with BuildLine():
            Line((14.58, -25.92), (14.58, 8.92))
            Line((14.58, 8.92), (21, 8.92))
            ThreePointArc((21, 8.92), (22.470782105, 9.529217895), (23.08, 11))
            Line((23.08, 11), (23.08, 14.08))
            Line((23.08, 14.08), (19.58, 14.08))
            Line((19.58, 14.08), (19.58, 19.92))
            Line((19.58, 19.92), (23.08, 19.92))
            Line((23.08, 19.92), (23.08, 33))
            ThreePointArc((23.08, 33), (23.64235498, 34.35764502), (25, 34.92))
            Line((25, 34.92), (41, 34.92))
            ThreePointArc((41, 34.92), (42.35764502, 34.35764502), (42.92, 33))
            Line((42.92, 33), (42.92, 19.92))
            Line((42.92, 19.92), (46.42, 19.92))
            Line((46.42, 19.92), (46.42, 14.08))
            Line((46.42, 14.08), (42.92, 14.08))
            Line((42.92, 14.08), (42.92, -25.92))
            Line((42.92, -25.92), (14.58, -25.92))
        make_face(mode=Mode.SUBTRACT)
    # profile 28 of 31: a face of its own
    with BuildSketch(Plane.XY):
        with BuildLine():
            ThreePointArc((137.079927657, 11), (137.079927657, 13), (135.34787685, 14))
            Line((135.34787685, 14), (109.944465005, 14))
            ThreePointArc((109.944465005, 14), (108.212414198, 13), (108.212414198, 11))
            Line((108.212414198, 11), (120.91412012, -11))
            ThreePointArc((120.91412012, -11), (122.646170928, -12), (124.378221735, -11))
            Line((124.378221735, -11), (137.079927657, 11))
        make_face()
        with BuildLine():
            Line((109.944465005, 13.92), (135.34787685, 13.92))
            ThreePointArc((135.34787685, 13.92), (137.010645625, 12.96), (137.010645625, 11.04))
            Line((137.010645625, 11.04), (124.308939703, -10.96))
            ThreePointArc((124.308939703, -10.96), (122.646170927, -11.92), (120.983402152, -10.96))
            Line((120.983402152, -10.96), (108.28169623, 11.04))
            ThreePointArc((108.28169623, 11.04), (108.28169623, 12.96), (109.944465005, 13.92))
        make_face(mode=Mode.SUBTRACT)
    # profile 29 of 31: a face of its own
    with BuildSketch(Plane.XY):
        with BuildLine():
            ThreePointArc((183.267949192, 11), (183.267949192, 13), (181.535898385, 14))
            Line((181.535898385, 14), (156.132486541, 14))
            ThreePointArc((156.132486541, 14), (154.400435733, 13), (154.400435733, 11))
            Line((154.400435733, 11), (167.102141655, -11))
            ThreePointArc((167.102141655, -11), (168.834192462, -12), (170.56624327, -11))
            Line((170.56624327, -11), (183.267949192, 11))
        make_face()
        with BuildLine():
            Line((156.132486541, 13.92), (181.535898385, 13.92))
            ThreePointArc((181.535898385, 13.92), (183.19866716, 12.96), (183.19866716, 11.04))
            Line((183.19866716, 11.04), (170.496961238, -10.96))
            ThreePointArc((170.496961238, -10.96), (168.834192462, -11.92), (167.171423687, -10.96))
            Line((167.171423687, -10.96), (154.469717765, 11.04))
            ThreePointArc((154.469717765, 11.04), (154.469717765, 12.96), (156.132486541, 13.92))
        make_face(mode=Mode.SUBTRACT)
    # profile 30 of 31: a face of its own
    with BuildSketch(Plane.XY):
        with BuildLine():
            ThreePointArc((85.11840343, -11), (85.11840343, -13), (86.850454238, -14))
            Line((86.850454238, -14), (112.253866082, -14))
            ThreePointArc((112.253866082, -14), (113.98591689, -13), (113.98591689, -11))
            Line((113.98591689, -11), (101.284210968, 11))
            ThreePointArc((101.284210968, 11), (99.55216016, 12), (97.820109352, 11))
            Line((97.820109352, 11), (85.11840343, -11))
        make_face()
        with BuildLine():
            Line((112.253866082, -13.92), (86.850454238, -13.92))
            ThreePointArc((86.850454238, -13.92), (85.187685462, -12.96), (85.187685462, -11.04))
            Line((85.187685462, -11.04), (97.889391385, 10.96))
            ThreePointArc((97.889391385, 10.96), (99.55216016, 11.92), (101.214928935, 10.96))
            Line((101.214928935, 10.96), (113.916634857, -11.04))
            ThreePointArc((113.916634857, -11.04), (113.916634857, -12.96), (112.253866082, -13.92))
        make_face(mode=Mode.SUBTRACT)
    # profile 31 of 31: a face of its own
    with BuildSketch(Plane.XY):
        with BuildLine():
            ThreePointArc((177.494446501, -11), (177.494446501, -13), (179.226497308, -14))
            Line((179.226497308, -14), (183, -14))
            ThreePointArc((183, -14), (184.414213562, -13.414213562), (185, -12))
            Line((185, -12), (185, -5.464101615))
            ThreePointArc((185, -5.464101615), (183.51763809, -3.532249963), (181.267949192, -4.464101615))
            Line((181.267949192, -4.464101615), (177.494446501, -11))
        make_face()
        with BuildLine():
            Line((183, -13.92), (179.226497308, -13.92))
            ThreePointArc((179.226497308, -13.92), (177.563728533, -12.96), (177.563728533, -11.04))
            Line((177.563728533, -11.04), (181.337231225, -4.504101615))
            ThreePointArc((181.337231225, -4.504101615), (183.496932567, -3.609524029), (184.92, -5.464101615))
            Line((184.92, -5.464101615), (184.92, -12))
            ThreePointArc((184.92, -12), (184.35764502, -13.35764502), (183, -13.92))
        make_face(mode=Mode.SUBTRACT)
    extrude(amount=MOVE_FACE1_DEPTH)

    # Move Face1 2 outline → Move Face1 2 (add)
    with BuildSketch(Plane.XY.offset(MOVE_START)):
        with BuildLine():
            Line((63.245553203, 20), (63.888189026, 20))
            ThreePointArc((63.888189026, 20), (64.034781848, 20.024120878), (64.18201732, 20.043944809))
            ThreePointArc((64.18201732, 20.043944809), (63.71430052, 20.010992244), (63.245553203, 20))
        make_face()
        with BuildLine():
            ThreePointArc((60.372341855, -6.024101615), (60.312442868, -5.746944327), (60.292341855, -5.464101615))
            Line((60.292341855, -5.464101615), (60.292341855, -11.715370829))
            ThreePointArc((60.292341855, -11.715370829), (60.332706457, -11.505691271), (60.372341855, -11.295872651))
            Line((60.372341855, -11.295872651), (60.372341855, -6.024101615))
        make_face()
        with BuildLine():
            ThreePointArc((64.50793191, 20.08), (64.430223434, 20.070420128), (64.352442334, 20.061448976))
            ThreePointArc((64.352442334, 20.061448976), (64.569116303, 20.075360125), (64.786186799, 20.08))
            Line((64.786186799, 20.08), (64.50793191, 20.08))
        make_face()
        with BuildLine():
            ThreePointArc((54.773667055, -24.687077537), (54.530793866, -25.21901902), (54.282754806, -25.748571429))
            ThreePointArc((54.282754806, -25.748571429), (57.943090164, -21.616069793), (63.245553203, -20.08))
            Line((63.245553203, -20.08), (64.786186799, -20.08))
            ThreePointArc((64.786186799, -20.08), (64.335409692, -20.059960474), (63.888189026, -20))
            Line((63.888189026, -20), (63.245553203, -20))
            ThreePointArc((63.245553203, -20), (58.404542184, -21.249879297), (54.773667055, -24.687077537))
        make_face()
    extrude(amount=MOVE_FACE1_2_DEPTH)

    # Move Face1 3 outline → Move Face1 3 (add)
    with BuildSketch(Plane.XY):
        with BuildLine():
            ThreePointArc((64.352442334, 20.061448976), (64.267156031, 20.053415386), (64.18201732, 20.043944809))
            ThreePointArc((64.18201732, 20.043944809), (64.267267313, 20.052331918), (64.352442334, 20.061448976))
        make_face()
    extrude(amount=MOVE_FACE1_3_DEPTH)


solid = part.part
